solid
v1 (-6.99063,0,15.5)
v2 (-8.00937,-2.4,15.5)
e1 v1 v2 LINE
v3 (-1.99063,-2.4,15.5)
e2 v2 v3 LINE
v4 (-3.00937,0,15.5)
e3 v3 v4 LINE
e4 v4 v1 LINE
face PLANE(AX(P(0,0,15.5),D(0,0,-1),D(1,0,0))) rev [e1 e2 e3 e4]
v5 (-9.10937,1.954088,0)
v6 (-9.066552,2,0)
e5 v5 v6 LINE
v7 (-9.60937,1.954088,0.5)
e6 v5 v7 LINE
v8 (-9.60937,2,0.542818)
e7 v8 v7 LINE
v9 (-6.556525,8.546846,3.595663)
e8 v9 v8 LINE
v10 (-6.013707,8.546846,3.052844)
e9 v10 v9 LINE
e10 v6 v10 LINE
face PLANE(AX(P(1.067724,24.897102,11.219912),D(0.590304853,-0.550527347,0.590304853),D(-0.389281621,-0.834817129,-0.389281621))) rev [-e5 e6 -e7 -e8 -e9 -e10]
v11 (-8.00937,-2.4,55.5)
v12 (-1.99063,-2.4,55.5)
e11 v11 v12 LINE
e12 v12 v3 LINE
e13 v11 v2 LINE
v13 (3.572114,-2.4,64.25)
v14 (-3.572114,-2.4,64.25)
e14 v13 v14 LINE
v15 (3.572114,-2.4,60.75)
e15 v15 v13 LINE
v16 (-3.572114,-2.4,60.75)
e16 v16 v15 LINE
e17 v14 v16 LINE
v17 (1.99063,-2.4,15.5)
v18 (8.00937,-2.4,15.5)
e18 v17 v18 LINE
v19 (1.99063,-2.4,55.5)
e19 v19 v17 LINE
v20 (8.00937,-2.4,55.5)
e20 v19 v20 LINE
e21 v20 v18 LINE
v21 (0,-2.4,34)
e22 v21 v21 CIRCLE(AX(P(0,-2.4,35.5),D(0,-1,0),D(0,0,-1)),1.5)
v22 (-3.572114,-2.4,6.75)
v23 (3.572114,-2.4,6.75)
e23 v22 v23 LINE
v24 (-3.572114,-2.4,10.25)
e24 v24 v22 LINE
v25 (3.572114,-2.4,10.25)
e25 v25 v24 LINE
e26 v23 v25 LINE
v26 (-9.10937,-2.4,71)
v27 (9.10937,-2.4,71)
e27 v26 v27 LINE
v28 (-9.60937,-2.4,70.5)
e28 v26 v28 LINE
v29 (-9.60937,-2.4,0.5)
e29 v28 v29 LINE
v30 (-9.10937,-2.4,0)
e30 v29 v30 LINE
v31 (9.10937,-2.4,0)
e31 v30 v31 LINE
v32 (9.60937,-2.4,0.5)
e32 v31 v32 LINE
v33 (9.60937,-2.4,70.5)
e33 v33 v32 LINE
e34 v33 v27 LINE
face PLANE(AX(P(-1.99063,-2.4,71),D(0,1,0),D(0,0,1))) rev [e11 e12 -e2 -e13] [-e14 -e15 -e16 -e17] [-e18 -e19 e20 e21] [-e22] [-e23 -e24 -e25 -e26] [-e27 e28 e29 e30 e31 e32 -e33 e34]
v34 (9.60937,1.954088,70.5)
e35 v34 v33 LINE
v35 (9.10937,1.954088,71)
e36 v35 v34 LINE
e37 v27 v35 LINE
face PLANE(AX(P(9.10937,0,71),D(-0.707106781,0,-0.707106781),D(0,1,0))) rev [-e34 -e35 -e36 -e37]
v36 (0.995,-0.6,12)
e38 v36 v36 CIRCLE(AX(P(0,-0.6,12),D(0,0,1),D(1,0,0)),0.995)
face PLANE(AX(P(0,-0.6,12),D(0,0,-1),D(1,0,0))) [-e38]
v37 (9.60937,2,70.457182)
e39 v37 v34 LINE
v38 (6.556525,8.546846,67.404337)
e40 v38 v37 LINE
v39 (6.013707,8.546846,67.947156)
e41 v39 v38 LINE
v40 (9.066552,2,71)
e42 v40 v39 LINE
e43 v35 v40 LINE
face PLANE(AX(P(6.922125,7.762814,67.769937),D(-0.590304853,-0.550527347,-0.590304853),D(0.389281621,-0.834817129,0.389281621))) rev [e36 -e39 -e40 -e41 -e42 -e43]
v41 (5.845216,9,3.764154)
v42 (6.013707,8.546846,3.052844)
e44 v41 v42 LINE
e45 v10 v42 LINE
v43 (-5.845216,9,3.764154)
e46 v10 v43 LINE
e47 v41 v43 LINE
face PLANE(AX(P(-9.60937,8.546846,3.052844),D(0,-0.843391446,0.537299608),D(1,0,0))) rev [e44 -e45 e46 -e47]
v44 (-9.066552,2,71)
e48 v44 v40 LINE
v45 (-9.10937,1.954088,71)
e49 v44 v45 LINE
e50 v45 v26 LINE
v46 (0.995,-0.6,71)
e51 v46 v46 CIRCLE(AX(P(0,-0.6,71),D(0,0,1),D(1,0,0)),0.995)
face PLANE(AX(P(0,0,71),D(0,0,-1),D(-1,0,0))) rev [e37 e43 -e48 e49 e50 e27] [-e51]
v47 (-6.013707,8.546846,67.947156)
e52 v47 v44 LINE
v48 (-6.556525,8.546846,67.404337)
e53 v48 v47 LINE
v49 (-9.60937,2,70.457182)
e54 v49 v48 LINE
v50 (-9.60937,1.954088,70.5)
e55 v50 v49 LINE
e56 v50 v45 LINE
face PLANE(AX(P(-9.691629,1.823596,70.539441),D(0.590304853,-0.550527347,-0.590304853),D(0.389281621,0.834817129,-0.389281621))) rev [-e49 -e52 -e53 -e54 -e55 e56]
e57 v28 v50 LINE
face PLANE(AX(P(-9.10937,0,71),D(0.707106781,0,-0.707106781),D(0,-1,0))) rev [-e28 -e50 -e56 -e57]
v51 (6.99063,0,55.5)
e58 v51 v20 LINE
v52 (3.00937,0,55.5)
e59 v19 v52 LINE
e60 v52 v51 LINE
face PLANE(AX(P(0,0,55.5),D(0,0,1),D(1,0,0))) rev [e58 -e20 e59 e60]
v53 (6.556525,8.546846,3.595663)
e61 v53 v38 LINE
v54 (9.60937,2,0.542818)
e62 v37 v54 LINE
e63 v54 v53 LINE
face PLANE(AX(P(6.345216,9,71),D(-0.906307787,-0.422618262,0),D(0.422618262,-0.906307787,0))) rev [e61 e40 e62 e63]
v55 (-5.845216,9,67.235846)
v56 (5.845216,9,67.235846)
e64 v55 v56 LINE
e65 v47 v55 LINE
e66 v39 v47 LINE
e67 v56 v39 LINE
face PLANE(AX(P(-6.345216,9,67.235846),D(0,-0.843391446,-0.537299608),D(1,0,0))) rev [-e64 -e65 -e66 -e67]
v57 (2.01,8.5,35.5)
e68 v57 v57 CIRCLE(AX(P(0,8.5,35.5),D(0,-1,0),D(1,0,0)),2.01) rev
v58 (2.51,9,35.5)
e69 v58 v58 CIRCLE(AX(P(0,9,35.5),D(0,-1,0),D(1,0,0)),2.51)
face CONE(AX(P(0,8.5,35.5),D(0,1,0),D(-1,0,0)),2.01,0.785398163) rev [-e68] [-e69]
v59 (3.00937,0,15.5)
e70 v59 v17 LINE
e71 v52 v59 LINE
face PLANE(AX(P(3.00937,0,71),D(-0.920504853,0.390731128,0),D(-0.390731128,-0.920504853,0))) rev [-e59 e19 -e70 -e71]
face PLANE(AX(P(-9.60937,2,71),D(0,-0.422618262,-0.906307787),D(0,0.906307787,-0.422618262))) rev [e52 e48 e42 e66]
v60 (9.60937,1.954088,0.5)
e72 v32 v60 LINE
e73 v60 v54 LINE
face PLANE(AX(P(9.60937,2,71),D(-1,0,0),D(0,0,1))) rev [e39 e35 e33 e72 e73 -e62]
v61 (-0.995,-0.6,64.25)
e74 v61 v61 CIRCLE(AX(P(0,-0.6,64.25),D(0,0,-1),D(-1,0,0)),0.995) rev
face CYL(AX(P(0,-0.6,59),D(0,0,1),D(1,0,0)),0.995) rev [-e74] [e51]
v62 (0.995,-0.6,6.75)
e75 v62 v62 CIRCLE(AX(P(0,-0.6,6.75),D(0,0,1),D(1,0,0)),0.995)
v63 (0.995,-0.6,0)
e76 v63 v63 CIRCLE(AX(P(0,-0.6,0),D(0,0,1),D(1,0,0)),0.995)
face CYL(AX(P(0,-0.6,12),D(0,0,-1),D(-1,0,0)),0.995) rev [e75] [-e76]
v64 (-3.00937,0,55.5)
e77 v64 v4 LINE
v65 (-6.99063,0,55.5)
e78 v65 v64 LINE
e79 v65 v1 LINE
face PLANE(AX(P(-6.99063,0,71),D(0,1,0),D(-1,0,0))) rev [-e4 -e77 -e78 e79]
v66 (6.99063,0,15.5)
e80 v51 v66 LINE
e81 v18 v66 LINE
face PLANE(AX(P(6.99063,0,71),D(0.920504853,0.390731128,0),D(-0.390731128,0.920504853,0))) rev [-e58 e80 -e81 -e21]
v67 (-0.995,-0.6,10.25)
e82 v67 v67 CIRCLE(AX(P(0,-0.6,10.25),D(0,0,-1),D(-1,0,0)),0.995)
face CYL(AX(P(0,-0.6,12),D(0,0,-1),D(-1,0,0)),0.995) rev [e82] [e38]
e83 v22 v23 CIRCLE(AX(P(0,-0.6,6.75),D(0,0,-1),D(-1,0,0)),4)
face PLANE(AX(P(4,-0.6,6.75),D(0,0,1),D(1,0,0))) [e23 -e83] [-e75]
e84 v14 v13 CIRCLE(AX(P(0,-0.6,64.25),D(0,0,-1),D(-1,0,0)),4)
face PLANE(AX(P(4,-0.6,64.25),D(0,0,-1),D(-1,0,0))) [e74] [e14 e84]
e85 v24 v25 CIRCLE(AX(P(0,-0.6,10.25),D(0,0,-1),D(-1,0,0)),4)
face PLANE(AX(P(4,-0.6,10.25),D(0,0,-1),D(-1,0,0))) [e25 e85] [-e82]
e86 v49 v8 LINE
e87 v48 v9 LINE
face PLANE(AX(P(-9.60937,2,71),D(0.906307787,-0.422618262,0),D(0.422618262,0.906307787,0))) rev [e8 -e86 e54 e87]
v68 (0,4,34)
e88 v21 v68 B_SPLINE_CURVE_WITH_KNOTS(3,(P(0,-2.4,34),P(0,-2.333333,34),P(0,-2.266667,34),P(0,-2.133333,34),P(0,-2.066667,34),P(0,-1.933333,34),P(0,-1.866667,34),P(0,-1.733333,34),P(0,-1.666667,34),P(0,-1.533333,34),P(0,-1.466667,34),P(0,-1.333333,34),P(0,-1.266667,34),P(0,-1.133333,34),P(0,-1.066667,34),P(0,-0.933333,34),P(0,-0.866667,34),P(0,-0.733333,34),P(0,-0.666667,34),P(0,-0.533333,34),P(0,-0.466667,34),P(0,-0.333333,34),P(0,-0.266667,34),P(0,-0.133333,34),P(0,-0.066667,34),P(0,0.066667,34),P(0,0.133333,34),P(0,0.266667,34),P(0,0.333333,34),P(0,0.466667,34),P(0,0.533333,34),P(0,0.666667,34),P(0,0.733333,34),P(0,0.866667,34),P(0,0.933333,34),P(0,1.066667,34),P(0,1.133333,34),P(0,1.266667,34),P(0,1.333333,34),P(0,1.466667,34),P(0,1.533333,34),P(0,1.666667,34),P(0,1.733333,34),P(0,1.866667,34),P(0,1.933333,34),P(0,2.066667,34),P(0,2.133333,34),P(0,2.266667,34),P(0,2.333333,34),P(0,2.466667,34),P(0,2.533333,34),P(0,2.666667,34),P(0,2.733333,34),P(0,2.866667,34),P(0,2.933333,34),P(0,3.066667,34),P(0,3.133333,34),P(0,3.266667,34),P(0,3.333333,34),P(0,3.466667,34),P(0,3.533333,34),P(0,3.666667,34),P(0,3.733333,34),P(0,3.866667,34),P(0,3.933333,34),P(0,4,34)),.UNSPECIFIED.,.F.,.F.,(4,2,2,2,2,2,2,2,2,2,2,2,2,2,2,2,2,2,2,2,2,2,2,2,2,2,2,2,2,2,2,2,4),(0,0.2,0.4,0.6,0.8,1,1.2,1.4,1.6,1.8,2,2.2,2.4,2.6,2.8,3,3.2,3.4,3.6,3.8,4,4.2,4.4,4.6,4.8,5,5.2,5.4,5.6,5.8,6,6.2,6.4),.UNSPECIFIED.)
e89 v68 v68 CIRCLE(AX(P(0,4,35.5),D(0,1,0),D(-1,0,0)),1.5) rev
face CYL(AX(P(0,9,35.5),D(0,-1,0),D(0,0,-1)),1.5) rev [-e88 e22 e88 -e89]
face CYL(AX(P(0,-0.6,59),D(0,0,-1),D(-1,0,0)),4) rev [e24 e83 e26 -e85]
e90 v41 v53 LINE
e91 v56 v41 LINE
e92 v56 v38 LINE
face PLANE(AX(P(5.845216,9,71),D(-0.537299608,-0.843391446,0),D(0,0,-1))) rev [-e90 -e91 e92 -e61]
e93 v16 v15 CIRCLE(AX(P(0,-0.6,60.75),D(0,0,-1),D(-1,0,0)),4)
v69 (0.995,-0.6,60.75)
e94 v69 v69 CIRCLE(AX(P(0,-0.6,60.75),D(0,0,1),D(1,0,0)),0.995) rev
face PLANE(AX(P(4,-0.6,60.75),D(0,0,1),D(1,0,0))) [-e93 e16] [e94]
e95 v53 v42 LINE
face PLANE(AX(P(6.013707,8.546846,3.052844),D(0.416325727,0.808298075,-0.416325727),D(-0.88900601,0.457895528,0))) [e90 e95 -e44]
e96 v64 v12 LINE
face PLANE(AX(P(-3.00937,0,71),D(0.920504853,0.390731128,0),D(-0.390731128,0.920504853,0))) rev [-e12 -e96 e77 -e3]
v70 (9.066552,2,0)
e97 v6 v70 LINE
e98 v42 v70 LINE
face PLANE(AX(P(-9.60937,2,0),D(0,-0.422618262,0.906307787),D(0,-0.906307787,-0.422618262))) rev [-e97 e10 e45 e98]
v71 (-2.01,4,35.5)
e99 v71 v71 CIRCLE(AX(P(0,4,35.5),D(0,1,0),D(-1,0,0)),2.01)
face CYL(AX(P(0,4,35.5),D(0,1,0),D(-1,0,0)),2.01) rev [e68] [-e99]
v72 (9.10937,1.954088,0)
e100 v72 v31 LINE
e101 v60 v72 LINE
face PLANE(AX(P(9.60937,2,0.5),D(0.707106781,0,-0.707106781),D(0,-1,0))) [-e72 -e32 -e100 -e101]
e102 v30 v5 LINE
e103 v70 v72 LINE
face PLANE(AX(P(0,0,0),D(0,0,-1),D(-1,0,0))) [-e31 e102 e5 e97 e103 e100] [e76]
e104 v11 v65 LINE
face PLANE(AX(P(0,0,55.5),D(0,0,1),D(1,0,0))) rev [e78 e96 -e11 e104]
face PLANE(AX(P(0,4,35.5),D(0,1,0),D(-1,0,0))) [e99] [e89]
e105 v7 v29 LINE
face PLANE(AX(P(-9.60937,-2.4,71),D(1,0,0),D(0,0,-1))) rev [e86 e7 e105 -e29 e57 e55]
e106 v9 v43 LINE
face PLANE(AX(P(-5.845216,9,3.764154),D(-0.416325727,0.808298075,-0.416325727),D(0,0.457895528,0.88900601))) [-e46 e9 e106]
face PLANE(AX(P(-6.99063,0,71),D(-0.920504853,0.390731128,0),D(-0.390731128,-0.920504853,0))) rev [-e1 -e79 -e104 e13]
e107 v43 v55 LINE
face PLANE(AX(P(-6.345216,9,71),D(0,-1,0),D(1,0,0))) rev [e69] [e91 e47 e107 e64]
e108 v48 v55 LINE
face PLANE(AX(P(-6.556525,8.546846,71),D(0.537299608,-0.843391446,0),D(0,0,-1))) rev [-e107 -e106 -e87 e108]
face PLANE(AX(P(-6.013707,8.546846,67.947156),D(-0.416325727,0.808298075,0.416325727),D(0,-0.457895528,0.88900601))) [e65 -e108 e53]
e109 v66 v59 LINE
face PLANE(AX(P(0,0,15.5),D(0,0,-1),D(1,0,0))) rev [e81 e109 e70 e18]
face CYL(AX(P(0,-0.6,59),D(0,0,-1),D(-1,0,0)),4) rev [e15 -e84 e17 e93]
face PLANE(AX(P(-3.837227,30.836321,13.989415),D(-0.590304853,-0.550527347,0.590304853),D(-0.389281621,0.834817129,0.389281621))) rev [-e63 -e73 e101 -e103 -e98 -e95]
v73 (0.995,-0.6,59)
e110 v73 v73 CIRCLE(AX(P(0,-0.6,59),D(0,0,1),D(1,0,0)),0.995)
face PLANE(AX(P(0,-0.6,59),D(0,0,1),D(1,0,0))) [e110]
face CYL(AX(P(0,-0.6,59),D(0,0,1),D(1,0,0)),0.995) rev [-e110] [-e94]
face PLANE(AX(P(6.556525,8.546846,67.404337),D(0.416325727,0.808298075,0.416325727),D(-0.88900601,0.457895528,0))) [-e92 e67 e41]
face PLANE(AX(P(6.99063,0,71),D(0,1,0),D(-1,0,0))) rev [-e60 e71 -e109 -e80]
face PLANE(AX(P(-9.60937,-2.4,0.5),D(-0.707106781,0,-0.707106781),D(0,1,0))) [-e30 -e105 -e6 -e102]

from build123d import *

# Parameters (mm, degrees)
EXTRUDE_1_DEPTH     = 71
CUT_EXTRUDE_1_DEPTH = 75.103710772
SKETCH_3_W          = 18.218739558
SKETCH_3_H          = 4.354088086
EXTRUDE_3_DEPTH     = 15.5
SKETCH_4_R          = 0.995
CUT_EXTRUDE_2_DEPTH = 12
SKETCH_5_W          = 4
SKETCH_5_H          = 3.5
SKETCH_6_R          = 1.5
CUT_EXTRUDE_3_DEPTH = 73.548604312
SKETCH_7_R          = 2.01
CUT_EXTRUDE_4_DEPTH = 5
CHAMFER_2_SIZE      = 0.5


with BuildPart() as part:
    # ｽｹｯﾁ1 → ﾎﾞｽ - 押し出し1 (new body)
    with BuildSketch(Plane.XY):
        Polygon((-6.990630221, 0), (-3.009369779, 0), (-1.990630221, -2.4), (1.990630221, -2.4), (3.009369779, 0), (6.990630221, 0), (8.009369779, -2.4), (9.609369779, -2.4), (9.609369779, 2), (6.345216172, 9), (-6.345216172, 9), (-9.609369779, 2), (-9.609369779, -2.4), (-8.009369779, -2.4), align=None)
    extrude(amount=EXTRUDE_1_DEPTH)

    # ｽｹｯﾁ2 → ｶｯﾄ - 押し出し1 (cut, through all)
    with BuildSketch(Plane(origin=(9.609369779, 0, 0), x_dir=(0, 0, -1), z_dir=(1, 0, 0))):
        Polygon((-71, 2), (-67.735846393, 9), (-71, 9), align=None)
        Polygon((-3.264153607, 9), (0, 9), (0, 2), align=None)
    extrude(amount=-CUT_EXTRUDE_1_DEPTH, mode=Mode.SUBTRACT)

    # 面取り1
    # the kernel refuses this chamfer: 0.5 mm, written as the material it takes off along each edge
    with BuildSketch(Plane(origin=(-6.138482875, 8.697897404, 3.470886905), x_dir=(0.1959067162203001, 0.5268881046463136, 0.8270486586180973), z_dir=(-0.41632572739388224, 0.8082980746110386, -0.4163257273938792)), Plane(origin=(6.138482875, 8.697897404, 3.470886905), x_dir=(-0.8270486586180952, 0.5268881046463165, 0.19590671622030123), z_dir=(0.4163257273938833, 0.8082980746110385, -0.41632572739387846))) as chamfer_1_piece_1:
        Polygon((-0.400884159, 0.228990916), (0.459173014, 0.228990916), (-0.058288855, -0.457981831), align=None)
    extrude(amount=0.4579583, mode=Mode.SUBTRACT)
    with BuildSketch(Plane(origin=(-6.138482875, 8.697897404, 67.529113095), x_dir=(-0.19590671622031064, -0.5268881046463169, 0.8270486586180926), z_dir=(-0.416325727393884, 0.808298074611038, 0.41632572739387863))) as chamfer_1_piece_2:
        Polygon((-0.459173014, 0.228990916), (0.400884159, 0.228990916), (0.058288855, -0.457981831), align=None)
    extrude(amount=0.4579583, mode=Mode.SUBTRACT)
    with BuildSketch(Plane(origin=(6.138482875, 8.697897404, 67.529113095), x_dir=(-0.8270486586180955, 0.5268881046463167, -0.19590671622029923), z_dir=(0.4163257273938827, 0.8082980746110371, 0.4163257273938819))) as chamfer_1_piece_3:
        Polygon((-0.400884159, -0.228990916), (0.459173014, -0.228990916), (-0.058288855, 0.457981831), align=None)
    extrude(amount=0.4579583, mode=Mode.SUBTRACT)
    with BuildSketch(Plane(origin=(9.609369779, -3.685841494, 71), x_dir=(-0.999621916911297, 0, 0.0274958766105822), z_dir=(0, 1, 0)), Plane(origin=(-9.609369779, 3.285841494, 71), x_dir=(0.999621916911297, 0, 0.0274958766105822), z_dir=(0, -1, 0))) as chamfer_1_piece_4:
        with BuildLine():
            Line((0.514336598, 0), (-0.028273577, -0.513558897))
            Line((-0.028273577, -0.513558897), (-0.038269797, -0.513283938))
            ThreePointArc((-0.038269797, -0.513283938), (-0.017064614, -0.256698915), (-0.009996219, 0.000274959))
            Line((-0.009996219, 0.000274959), (0.000274959, 0.009996219))
            ThreePointArc((0.000274959, 0.009996219), (0.257248832, 0.002927825), (0.514611556, 0.009996219))
            Line((0.514611556, 0.009996219), (0.514336598, 0))
        make_face()
    extrude(amount=6.971682988, mode=Mode.SUBTRACT)
    with BuildSketch(Plane(origin=(-9.609369779, 3.285841494, 0), x_dir=(0.9996219169112968, 0, -0.02749587661058639), z_dir=(0, -1, 0)), Plane(origin=(9.609369779, -3.685841494, 0), x_dir=(-0.9996219169112968, 0, -0.02749587661058639), z_dir=(0, 1, 0))) as chamfer_1_piece_5:
        with BuildLine():
            Line((0.514336598, 0), (-0.028273577, 0.513558897))
            Line((-0.028273577, 0.513558897), (-0.038269797, 0.513283938))
            ThreePointArc((-0.038269797, 0.513283938), (-0.017064614, 0.256698915), (-0.009996219, -0.000274959))
            Line((-0.009996219, -0.000274959), (0.000274959, -0.009996219))
            ThreePointArc((0.000274959, -0.009996219), (0.257248832, -0.002927825), (0.514611556, -0.009996219))
            Line((0.514611556, -0.009996219), (0.514336598, 0))
        make_face()
    extrude(amount=6.971682988, mode=Mode.SUBTRACT)
    with BuildSketch(Plane(origin=(-6.345216172, 9, 1.971704795), x_dir=(-0.441365564598093, -0.897327386401979, 0), z_dir=(0, 0, 1))) as chamfer_1_piece_6:
        with BuildLine():
            Line((0.516979525, 0), (-0.237770334, 0.459056747))
            Line((-0.237770334, 0.459056747), (-0.246743608, 0.454643091))
            ThreePointArc((-0.246743608, 0.454643091), (-0.123037104, 0.227486173), (-0.008973274, -0.004413656))
            Line((-0.008973274, -0.004413656), (0.000207861, -0.009997839))
            ThreePointArc((0.000207861, -0.009997839), (0.25858594, -0.004626004), (0.517187386, -0.009997839))
            Line((0.517187386, -0.009997839), (0.516979525, 0))
        make_face()
    extrude(amount=67.056590409, mode=Mode.SUBTRACT)
    with BuildSketch(Plane(origin=(6.345216172, 9, 1.971704795), x_dir=(0.441365564598093, -0.897327386401979, 0), z_dir=(0, 0, 1))) as chamfer_1_piece_7:
        with BuildLine():
            Line((0.516979525, 0), (-0.237770334, -0.459056747))
            Line((-0.237770334, -0.459056747), (-0.246743608, -0.454643091))
            ThreePointArc((-0.246743608, -0.454643091), (-0.123037104, -0.227486173), (-0.008973274, 0.004413656))
            Line((-0.008973274, 0.004413656), (0.000207861, 0.009997839))
            ThreePointArc((0.000207861, 0.009997839), (0.25858594, 0.004626004), (0.517187386, 0.009997839))
            Line((0.517187386, 0.009997839), (0.516979525, 0))
        make_face()
    extrude(amount=67.056590409, mode=Mode.SUBTRACT)
    with BuildSketch(Plane(origin=(7.637664984, 9, 67.735846393), x_dir=(0, -0.8973273864019788, 0.441365564598093), z_dir=(-1, 0, 0))) as chamfer_1_piece_8:
        with BuildLine():
            Line((0.516979525, 0), (-0.237770334, -0.459056747))
            Line((-0.237770334, -0.459056747), (-0.246743608, -0.454643091))
            ThreePointArc((-0.246743608, -0.454643091), (-0.123037104, -0.227486173), (-0.008973274, 0.004413656))
            Line((-0.008973274, 0.004413656), (0.000207861, 0.009997839))
            ThreePointArc((0.000207861, 0.009997839), (0.25858594, 0.004626004), (0.517187386, 0.009997839))
            Line((0.517187386, 0.009997839), (0.516979525, 0))
        make_face()
    extrude(amount=15.275329968, mode=Mode.SUBTRACT)
    with BuildSketch(Plane(origin=(5.843517245, 10.075896822, 67.234147465), x_dir=(-0.9208340423276119, -0.34219239318368305, 0.1870000869994816), z_dir=(0.38928162063502697, -0.8348171294789895, 0.3892816206350193)), Plane(origin=(-10.111068707, 0.924103178, 71.501698928), x_dir=(0.9208340423276127, -0.3421923931836955, 0.1870000869994551), z_dir=(0.3892816206350268, 0.8348171294789896, -0.38928162063501937))) as chamfer_1_piece_9:
        with BuildLine():
            Line((0.515512576, 0), (-0.117174183, 0.502019349))
            Line((-0.117174183, 0.502019349), (-0.126965941, 0.499989208))
            ThreePointArc((-0.126965941, 0.499989208), (-0.062103739, 0.250280562), (-0.009791758, -0.002030141))
            Line((-0.009791758, -0.002030141), (0.000248629, -0.009996909))
            ThreePointArc((0.000248629, -0.009996909), (0.257845581, -0.003590326), (0.515761205, -0.009996909))
            Line((0.515761205, -0.009996909), (0.515512576, 0))
        make_face()
    extrude(amount=10.962632798, mode=Mode.SUBTRACT)
    with BuildSketch(Plane(origin=(5.843517245, 10.075896822, 3.765852535), x_dir=(-0.9208340423276121, -0.3421923931836904, -0.18700008699946713), z_dir=(0.3892816206350273, -0.8348171294789902, -0.38928162063501737)), Plane(origin=(-10.111068707, 0.924103178, -0.501698928), x_dir=(0.9208340423276121, -0.3421923931836903, -0.18700008699946674), z_dir=(0.38928162063502714, 0.8348171294789903, 0.38928162063501737))) as chamfer_1_piece_10:
        with BuildLine():
            Line((0.515512576, 0), (-0.117174183, -0.502019349))
            Line((-0.117174183, -0.502019349), (-0.126965941, -0.499989208))
            ThreePointArc((-0.126965941, -0.499989208), (-0.062103739, -0.250280562), (-0.009791758, 0.002030141))
            Line((-0.009791758, 0.002030141), (0.000248629, 0.009996909))
            ThreePointArc((0.000248629, 0.009996909), (0.257845581, 0.003590326), (0.515761205, 0.009996909))
            Line((0.515761205, 0.009996909), (0.515512576, 0))
        make_face()
    extrude(amount=10.962632798, mode=Mode.SUBTRACT)
    with BuildSketch(Plane(origin=(7.637664984, 9, 3.264153607), x_dir=(0, -0.8973273864019832, -0.4413655645980848), z_dir=(-1, 0, 0))) as chamfer_1_piece_11:
        with BuildLine():
            Line((0.516979525, 0), (-0.237770334, 0.459056747))
            Line((-0.237770334, 0.459056747), (-0.246743608, 0.454643091))
            ThreePointArc((-0.246743608, 0.454643091), (-0.123037104, 0.227486173), (-0.008973274, -0.004413656))
            Line((-0.008973274, -0.004413656), (0.000207861, -0.009997839))
            ThreePointArc((0.000207861, -0.009997839), (0.25858594, -0.004626004), (0.517187386, -0.009997839))
            Line((0.517187386, -0.009997839), (0.516979525, 0))
        make_face()
    extrude(amount=15.275329968, mode=Mode.SUBTRACT)

    # ｽｹｯﾁ3 → ﾎﾞｽ - 押し出し3 (add)
    with BuildSketch(Plane.XY.offset(71)):
        with Locations((0, -0.222955957)):
            Rectangle(SKETCH_3_W, SKETCH_3_H)
    extrude_3 = extrude(amount=-EXTRUDE_3_DEPTH)

    # ｽｹｯﾁ4 → ｶｯﾄ - 押し出し2 (cut)
    with BuildSketch(Plane.XY.offset(71)):
        with Locations((0, -0.6)):
            Circle(SKETCH_4_R)
    cut_extrude_2 = extrude(amount=-CUT_EXTRUDE_2_DEPTH, mode=Mode.SUBTRACT)

    # ﾐﾗｰ1: ﾎﾞｽ - 押し出し3, ｶｯﾄ - 押し出し2 across plane
    add(extrude_3.mirror(Plane(origin=(0, 0, 35.5), x_dir=(1, 0, 0), z_dir=(0, 0, -1))))
    add(cut_extrude_2.mirror(Plane(origin=(0, 0, 35.5), x_dir=(1, 0, 0), z_dir=(0, 0, -1))), mode=Mode.SUBTRACT)

    # ｽｹｯﾁ5 → ｶｯﾄ - 回転1 (revolve, cut)
    with BuildSketch(Plane(origin=(0, -0.6, 0), x_dir=(1, 0, 0), z_dir=(0, 1, 0))):
        with Locations((2, -62.5)):
            Rectangle(SKETCH_5_W, SKETCH_5_H)
        with Locations((2, -8.5)):
            Rectangle(SKETCH_5_W, SKETCH_5_H)
    revolve(axis=Axis((0, -0.6, 59), (0, 0, 1)), mode=Mode.SUBTRACT)

    # ｽｹｯﾁ6 → ｶｯﾄ - 押し出し3 (cut, through all)
    with BuildSketch(Plane.XZ.offset(2.4)):
        with Locations(Location((0, 35.5, 0), (0, 0, 270))):
            Circle(SKETCH_6_R)
    extrude(amount=-CUT_EXTRUDE_3_DEPTH, mode=Mode.SUBTRACT)

    # ｽｹｯﾁ7 → ｶｯﾄ - 押し出し4 (cut)
    with BuildSketch(Plane(origin=(0, 9, 0), x_dir=(1, 0, 0), z_dir=(0, 1, 0))):
        with Locations(Location((0, -35.5, 0), (0, 0, 180))):
            Circle(SKETCH_7_R)
    extrude(amount=-CUT_EXTRUDE_4_DEPTH, mode=Mode.SUBTRACT)

    # 面取り2
    chamfer_2_edges = [part.edges().sort_by_distance(p)[0] for p in [
        (2.01, 9, 35.5),
    ]]
    chamfer(chamfer_2_edges, length=CHAMFER_2_SIZE)


solid = part.part
